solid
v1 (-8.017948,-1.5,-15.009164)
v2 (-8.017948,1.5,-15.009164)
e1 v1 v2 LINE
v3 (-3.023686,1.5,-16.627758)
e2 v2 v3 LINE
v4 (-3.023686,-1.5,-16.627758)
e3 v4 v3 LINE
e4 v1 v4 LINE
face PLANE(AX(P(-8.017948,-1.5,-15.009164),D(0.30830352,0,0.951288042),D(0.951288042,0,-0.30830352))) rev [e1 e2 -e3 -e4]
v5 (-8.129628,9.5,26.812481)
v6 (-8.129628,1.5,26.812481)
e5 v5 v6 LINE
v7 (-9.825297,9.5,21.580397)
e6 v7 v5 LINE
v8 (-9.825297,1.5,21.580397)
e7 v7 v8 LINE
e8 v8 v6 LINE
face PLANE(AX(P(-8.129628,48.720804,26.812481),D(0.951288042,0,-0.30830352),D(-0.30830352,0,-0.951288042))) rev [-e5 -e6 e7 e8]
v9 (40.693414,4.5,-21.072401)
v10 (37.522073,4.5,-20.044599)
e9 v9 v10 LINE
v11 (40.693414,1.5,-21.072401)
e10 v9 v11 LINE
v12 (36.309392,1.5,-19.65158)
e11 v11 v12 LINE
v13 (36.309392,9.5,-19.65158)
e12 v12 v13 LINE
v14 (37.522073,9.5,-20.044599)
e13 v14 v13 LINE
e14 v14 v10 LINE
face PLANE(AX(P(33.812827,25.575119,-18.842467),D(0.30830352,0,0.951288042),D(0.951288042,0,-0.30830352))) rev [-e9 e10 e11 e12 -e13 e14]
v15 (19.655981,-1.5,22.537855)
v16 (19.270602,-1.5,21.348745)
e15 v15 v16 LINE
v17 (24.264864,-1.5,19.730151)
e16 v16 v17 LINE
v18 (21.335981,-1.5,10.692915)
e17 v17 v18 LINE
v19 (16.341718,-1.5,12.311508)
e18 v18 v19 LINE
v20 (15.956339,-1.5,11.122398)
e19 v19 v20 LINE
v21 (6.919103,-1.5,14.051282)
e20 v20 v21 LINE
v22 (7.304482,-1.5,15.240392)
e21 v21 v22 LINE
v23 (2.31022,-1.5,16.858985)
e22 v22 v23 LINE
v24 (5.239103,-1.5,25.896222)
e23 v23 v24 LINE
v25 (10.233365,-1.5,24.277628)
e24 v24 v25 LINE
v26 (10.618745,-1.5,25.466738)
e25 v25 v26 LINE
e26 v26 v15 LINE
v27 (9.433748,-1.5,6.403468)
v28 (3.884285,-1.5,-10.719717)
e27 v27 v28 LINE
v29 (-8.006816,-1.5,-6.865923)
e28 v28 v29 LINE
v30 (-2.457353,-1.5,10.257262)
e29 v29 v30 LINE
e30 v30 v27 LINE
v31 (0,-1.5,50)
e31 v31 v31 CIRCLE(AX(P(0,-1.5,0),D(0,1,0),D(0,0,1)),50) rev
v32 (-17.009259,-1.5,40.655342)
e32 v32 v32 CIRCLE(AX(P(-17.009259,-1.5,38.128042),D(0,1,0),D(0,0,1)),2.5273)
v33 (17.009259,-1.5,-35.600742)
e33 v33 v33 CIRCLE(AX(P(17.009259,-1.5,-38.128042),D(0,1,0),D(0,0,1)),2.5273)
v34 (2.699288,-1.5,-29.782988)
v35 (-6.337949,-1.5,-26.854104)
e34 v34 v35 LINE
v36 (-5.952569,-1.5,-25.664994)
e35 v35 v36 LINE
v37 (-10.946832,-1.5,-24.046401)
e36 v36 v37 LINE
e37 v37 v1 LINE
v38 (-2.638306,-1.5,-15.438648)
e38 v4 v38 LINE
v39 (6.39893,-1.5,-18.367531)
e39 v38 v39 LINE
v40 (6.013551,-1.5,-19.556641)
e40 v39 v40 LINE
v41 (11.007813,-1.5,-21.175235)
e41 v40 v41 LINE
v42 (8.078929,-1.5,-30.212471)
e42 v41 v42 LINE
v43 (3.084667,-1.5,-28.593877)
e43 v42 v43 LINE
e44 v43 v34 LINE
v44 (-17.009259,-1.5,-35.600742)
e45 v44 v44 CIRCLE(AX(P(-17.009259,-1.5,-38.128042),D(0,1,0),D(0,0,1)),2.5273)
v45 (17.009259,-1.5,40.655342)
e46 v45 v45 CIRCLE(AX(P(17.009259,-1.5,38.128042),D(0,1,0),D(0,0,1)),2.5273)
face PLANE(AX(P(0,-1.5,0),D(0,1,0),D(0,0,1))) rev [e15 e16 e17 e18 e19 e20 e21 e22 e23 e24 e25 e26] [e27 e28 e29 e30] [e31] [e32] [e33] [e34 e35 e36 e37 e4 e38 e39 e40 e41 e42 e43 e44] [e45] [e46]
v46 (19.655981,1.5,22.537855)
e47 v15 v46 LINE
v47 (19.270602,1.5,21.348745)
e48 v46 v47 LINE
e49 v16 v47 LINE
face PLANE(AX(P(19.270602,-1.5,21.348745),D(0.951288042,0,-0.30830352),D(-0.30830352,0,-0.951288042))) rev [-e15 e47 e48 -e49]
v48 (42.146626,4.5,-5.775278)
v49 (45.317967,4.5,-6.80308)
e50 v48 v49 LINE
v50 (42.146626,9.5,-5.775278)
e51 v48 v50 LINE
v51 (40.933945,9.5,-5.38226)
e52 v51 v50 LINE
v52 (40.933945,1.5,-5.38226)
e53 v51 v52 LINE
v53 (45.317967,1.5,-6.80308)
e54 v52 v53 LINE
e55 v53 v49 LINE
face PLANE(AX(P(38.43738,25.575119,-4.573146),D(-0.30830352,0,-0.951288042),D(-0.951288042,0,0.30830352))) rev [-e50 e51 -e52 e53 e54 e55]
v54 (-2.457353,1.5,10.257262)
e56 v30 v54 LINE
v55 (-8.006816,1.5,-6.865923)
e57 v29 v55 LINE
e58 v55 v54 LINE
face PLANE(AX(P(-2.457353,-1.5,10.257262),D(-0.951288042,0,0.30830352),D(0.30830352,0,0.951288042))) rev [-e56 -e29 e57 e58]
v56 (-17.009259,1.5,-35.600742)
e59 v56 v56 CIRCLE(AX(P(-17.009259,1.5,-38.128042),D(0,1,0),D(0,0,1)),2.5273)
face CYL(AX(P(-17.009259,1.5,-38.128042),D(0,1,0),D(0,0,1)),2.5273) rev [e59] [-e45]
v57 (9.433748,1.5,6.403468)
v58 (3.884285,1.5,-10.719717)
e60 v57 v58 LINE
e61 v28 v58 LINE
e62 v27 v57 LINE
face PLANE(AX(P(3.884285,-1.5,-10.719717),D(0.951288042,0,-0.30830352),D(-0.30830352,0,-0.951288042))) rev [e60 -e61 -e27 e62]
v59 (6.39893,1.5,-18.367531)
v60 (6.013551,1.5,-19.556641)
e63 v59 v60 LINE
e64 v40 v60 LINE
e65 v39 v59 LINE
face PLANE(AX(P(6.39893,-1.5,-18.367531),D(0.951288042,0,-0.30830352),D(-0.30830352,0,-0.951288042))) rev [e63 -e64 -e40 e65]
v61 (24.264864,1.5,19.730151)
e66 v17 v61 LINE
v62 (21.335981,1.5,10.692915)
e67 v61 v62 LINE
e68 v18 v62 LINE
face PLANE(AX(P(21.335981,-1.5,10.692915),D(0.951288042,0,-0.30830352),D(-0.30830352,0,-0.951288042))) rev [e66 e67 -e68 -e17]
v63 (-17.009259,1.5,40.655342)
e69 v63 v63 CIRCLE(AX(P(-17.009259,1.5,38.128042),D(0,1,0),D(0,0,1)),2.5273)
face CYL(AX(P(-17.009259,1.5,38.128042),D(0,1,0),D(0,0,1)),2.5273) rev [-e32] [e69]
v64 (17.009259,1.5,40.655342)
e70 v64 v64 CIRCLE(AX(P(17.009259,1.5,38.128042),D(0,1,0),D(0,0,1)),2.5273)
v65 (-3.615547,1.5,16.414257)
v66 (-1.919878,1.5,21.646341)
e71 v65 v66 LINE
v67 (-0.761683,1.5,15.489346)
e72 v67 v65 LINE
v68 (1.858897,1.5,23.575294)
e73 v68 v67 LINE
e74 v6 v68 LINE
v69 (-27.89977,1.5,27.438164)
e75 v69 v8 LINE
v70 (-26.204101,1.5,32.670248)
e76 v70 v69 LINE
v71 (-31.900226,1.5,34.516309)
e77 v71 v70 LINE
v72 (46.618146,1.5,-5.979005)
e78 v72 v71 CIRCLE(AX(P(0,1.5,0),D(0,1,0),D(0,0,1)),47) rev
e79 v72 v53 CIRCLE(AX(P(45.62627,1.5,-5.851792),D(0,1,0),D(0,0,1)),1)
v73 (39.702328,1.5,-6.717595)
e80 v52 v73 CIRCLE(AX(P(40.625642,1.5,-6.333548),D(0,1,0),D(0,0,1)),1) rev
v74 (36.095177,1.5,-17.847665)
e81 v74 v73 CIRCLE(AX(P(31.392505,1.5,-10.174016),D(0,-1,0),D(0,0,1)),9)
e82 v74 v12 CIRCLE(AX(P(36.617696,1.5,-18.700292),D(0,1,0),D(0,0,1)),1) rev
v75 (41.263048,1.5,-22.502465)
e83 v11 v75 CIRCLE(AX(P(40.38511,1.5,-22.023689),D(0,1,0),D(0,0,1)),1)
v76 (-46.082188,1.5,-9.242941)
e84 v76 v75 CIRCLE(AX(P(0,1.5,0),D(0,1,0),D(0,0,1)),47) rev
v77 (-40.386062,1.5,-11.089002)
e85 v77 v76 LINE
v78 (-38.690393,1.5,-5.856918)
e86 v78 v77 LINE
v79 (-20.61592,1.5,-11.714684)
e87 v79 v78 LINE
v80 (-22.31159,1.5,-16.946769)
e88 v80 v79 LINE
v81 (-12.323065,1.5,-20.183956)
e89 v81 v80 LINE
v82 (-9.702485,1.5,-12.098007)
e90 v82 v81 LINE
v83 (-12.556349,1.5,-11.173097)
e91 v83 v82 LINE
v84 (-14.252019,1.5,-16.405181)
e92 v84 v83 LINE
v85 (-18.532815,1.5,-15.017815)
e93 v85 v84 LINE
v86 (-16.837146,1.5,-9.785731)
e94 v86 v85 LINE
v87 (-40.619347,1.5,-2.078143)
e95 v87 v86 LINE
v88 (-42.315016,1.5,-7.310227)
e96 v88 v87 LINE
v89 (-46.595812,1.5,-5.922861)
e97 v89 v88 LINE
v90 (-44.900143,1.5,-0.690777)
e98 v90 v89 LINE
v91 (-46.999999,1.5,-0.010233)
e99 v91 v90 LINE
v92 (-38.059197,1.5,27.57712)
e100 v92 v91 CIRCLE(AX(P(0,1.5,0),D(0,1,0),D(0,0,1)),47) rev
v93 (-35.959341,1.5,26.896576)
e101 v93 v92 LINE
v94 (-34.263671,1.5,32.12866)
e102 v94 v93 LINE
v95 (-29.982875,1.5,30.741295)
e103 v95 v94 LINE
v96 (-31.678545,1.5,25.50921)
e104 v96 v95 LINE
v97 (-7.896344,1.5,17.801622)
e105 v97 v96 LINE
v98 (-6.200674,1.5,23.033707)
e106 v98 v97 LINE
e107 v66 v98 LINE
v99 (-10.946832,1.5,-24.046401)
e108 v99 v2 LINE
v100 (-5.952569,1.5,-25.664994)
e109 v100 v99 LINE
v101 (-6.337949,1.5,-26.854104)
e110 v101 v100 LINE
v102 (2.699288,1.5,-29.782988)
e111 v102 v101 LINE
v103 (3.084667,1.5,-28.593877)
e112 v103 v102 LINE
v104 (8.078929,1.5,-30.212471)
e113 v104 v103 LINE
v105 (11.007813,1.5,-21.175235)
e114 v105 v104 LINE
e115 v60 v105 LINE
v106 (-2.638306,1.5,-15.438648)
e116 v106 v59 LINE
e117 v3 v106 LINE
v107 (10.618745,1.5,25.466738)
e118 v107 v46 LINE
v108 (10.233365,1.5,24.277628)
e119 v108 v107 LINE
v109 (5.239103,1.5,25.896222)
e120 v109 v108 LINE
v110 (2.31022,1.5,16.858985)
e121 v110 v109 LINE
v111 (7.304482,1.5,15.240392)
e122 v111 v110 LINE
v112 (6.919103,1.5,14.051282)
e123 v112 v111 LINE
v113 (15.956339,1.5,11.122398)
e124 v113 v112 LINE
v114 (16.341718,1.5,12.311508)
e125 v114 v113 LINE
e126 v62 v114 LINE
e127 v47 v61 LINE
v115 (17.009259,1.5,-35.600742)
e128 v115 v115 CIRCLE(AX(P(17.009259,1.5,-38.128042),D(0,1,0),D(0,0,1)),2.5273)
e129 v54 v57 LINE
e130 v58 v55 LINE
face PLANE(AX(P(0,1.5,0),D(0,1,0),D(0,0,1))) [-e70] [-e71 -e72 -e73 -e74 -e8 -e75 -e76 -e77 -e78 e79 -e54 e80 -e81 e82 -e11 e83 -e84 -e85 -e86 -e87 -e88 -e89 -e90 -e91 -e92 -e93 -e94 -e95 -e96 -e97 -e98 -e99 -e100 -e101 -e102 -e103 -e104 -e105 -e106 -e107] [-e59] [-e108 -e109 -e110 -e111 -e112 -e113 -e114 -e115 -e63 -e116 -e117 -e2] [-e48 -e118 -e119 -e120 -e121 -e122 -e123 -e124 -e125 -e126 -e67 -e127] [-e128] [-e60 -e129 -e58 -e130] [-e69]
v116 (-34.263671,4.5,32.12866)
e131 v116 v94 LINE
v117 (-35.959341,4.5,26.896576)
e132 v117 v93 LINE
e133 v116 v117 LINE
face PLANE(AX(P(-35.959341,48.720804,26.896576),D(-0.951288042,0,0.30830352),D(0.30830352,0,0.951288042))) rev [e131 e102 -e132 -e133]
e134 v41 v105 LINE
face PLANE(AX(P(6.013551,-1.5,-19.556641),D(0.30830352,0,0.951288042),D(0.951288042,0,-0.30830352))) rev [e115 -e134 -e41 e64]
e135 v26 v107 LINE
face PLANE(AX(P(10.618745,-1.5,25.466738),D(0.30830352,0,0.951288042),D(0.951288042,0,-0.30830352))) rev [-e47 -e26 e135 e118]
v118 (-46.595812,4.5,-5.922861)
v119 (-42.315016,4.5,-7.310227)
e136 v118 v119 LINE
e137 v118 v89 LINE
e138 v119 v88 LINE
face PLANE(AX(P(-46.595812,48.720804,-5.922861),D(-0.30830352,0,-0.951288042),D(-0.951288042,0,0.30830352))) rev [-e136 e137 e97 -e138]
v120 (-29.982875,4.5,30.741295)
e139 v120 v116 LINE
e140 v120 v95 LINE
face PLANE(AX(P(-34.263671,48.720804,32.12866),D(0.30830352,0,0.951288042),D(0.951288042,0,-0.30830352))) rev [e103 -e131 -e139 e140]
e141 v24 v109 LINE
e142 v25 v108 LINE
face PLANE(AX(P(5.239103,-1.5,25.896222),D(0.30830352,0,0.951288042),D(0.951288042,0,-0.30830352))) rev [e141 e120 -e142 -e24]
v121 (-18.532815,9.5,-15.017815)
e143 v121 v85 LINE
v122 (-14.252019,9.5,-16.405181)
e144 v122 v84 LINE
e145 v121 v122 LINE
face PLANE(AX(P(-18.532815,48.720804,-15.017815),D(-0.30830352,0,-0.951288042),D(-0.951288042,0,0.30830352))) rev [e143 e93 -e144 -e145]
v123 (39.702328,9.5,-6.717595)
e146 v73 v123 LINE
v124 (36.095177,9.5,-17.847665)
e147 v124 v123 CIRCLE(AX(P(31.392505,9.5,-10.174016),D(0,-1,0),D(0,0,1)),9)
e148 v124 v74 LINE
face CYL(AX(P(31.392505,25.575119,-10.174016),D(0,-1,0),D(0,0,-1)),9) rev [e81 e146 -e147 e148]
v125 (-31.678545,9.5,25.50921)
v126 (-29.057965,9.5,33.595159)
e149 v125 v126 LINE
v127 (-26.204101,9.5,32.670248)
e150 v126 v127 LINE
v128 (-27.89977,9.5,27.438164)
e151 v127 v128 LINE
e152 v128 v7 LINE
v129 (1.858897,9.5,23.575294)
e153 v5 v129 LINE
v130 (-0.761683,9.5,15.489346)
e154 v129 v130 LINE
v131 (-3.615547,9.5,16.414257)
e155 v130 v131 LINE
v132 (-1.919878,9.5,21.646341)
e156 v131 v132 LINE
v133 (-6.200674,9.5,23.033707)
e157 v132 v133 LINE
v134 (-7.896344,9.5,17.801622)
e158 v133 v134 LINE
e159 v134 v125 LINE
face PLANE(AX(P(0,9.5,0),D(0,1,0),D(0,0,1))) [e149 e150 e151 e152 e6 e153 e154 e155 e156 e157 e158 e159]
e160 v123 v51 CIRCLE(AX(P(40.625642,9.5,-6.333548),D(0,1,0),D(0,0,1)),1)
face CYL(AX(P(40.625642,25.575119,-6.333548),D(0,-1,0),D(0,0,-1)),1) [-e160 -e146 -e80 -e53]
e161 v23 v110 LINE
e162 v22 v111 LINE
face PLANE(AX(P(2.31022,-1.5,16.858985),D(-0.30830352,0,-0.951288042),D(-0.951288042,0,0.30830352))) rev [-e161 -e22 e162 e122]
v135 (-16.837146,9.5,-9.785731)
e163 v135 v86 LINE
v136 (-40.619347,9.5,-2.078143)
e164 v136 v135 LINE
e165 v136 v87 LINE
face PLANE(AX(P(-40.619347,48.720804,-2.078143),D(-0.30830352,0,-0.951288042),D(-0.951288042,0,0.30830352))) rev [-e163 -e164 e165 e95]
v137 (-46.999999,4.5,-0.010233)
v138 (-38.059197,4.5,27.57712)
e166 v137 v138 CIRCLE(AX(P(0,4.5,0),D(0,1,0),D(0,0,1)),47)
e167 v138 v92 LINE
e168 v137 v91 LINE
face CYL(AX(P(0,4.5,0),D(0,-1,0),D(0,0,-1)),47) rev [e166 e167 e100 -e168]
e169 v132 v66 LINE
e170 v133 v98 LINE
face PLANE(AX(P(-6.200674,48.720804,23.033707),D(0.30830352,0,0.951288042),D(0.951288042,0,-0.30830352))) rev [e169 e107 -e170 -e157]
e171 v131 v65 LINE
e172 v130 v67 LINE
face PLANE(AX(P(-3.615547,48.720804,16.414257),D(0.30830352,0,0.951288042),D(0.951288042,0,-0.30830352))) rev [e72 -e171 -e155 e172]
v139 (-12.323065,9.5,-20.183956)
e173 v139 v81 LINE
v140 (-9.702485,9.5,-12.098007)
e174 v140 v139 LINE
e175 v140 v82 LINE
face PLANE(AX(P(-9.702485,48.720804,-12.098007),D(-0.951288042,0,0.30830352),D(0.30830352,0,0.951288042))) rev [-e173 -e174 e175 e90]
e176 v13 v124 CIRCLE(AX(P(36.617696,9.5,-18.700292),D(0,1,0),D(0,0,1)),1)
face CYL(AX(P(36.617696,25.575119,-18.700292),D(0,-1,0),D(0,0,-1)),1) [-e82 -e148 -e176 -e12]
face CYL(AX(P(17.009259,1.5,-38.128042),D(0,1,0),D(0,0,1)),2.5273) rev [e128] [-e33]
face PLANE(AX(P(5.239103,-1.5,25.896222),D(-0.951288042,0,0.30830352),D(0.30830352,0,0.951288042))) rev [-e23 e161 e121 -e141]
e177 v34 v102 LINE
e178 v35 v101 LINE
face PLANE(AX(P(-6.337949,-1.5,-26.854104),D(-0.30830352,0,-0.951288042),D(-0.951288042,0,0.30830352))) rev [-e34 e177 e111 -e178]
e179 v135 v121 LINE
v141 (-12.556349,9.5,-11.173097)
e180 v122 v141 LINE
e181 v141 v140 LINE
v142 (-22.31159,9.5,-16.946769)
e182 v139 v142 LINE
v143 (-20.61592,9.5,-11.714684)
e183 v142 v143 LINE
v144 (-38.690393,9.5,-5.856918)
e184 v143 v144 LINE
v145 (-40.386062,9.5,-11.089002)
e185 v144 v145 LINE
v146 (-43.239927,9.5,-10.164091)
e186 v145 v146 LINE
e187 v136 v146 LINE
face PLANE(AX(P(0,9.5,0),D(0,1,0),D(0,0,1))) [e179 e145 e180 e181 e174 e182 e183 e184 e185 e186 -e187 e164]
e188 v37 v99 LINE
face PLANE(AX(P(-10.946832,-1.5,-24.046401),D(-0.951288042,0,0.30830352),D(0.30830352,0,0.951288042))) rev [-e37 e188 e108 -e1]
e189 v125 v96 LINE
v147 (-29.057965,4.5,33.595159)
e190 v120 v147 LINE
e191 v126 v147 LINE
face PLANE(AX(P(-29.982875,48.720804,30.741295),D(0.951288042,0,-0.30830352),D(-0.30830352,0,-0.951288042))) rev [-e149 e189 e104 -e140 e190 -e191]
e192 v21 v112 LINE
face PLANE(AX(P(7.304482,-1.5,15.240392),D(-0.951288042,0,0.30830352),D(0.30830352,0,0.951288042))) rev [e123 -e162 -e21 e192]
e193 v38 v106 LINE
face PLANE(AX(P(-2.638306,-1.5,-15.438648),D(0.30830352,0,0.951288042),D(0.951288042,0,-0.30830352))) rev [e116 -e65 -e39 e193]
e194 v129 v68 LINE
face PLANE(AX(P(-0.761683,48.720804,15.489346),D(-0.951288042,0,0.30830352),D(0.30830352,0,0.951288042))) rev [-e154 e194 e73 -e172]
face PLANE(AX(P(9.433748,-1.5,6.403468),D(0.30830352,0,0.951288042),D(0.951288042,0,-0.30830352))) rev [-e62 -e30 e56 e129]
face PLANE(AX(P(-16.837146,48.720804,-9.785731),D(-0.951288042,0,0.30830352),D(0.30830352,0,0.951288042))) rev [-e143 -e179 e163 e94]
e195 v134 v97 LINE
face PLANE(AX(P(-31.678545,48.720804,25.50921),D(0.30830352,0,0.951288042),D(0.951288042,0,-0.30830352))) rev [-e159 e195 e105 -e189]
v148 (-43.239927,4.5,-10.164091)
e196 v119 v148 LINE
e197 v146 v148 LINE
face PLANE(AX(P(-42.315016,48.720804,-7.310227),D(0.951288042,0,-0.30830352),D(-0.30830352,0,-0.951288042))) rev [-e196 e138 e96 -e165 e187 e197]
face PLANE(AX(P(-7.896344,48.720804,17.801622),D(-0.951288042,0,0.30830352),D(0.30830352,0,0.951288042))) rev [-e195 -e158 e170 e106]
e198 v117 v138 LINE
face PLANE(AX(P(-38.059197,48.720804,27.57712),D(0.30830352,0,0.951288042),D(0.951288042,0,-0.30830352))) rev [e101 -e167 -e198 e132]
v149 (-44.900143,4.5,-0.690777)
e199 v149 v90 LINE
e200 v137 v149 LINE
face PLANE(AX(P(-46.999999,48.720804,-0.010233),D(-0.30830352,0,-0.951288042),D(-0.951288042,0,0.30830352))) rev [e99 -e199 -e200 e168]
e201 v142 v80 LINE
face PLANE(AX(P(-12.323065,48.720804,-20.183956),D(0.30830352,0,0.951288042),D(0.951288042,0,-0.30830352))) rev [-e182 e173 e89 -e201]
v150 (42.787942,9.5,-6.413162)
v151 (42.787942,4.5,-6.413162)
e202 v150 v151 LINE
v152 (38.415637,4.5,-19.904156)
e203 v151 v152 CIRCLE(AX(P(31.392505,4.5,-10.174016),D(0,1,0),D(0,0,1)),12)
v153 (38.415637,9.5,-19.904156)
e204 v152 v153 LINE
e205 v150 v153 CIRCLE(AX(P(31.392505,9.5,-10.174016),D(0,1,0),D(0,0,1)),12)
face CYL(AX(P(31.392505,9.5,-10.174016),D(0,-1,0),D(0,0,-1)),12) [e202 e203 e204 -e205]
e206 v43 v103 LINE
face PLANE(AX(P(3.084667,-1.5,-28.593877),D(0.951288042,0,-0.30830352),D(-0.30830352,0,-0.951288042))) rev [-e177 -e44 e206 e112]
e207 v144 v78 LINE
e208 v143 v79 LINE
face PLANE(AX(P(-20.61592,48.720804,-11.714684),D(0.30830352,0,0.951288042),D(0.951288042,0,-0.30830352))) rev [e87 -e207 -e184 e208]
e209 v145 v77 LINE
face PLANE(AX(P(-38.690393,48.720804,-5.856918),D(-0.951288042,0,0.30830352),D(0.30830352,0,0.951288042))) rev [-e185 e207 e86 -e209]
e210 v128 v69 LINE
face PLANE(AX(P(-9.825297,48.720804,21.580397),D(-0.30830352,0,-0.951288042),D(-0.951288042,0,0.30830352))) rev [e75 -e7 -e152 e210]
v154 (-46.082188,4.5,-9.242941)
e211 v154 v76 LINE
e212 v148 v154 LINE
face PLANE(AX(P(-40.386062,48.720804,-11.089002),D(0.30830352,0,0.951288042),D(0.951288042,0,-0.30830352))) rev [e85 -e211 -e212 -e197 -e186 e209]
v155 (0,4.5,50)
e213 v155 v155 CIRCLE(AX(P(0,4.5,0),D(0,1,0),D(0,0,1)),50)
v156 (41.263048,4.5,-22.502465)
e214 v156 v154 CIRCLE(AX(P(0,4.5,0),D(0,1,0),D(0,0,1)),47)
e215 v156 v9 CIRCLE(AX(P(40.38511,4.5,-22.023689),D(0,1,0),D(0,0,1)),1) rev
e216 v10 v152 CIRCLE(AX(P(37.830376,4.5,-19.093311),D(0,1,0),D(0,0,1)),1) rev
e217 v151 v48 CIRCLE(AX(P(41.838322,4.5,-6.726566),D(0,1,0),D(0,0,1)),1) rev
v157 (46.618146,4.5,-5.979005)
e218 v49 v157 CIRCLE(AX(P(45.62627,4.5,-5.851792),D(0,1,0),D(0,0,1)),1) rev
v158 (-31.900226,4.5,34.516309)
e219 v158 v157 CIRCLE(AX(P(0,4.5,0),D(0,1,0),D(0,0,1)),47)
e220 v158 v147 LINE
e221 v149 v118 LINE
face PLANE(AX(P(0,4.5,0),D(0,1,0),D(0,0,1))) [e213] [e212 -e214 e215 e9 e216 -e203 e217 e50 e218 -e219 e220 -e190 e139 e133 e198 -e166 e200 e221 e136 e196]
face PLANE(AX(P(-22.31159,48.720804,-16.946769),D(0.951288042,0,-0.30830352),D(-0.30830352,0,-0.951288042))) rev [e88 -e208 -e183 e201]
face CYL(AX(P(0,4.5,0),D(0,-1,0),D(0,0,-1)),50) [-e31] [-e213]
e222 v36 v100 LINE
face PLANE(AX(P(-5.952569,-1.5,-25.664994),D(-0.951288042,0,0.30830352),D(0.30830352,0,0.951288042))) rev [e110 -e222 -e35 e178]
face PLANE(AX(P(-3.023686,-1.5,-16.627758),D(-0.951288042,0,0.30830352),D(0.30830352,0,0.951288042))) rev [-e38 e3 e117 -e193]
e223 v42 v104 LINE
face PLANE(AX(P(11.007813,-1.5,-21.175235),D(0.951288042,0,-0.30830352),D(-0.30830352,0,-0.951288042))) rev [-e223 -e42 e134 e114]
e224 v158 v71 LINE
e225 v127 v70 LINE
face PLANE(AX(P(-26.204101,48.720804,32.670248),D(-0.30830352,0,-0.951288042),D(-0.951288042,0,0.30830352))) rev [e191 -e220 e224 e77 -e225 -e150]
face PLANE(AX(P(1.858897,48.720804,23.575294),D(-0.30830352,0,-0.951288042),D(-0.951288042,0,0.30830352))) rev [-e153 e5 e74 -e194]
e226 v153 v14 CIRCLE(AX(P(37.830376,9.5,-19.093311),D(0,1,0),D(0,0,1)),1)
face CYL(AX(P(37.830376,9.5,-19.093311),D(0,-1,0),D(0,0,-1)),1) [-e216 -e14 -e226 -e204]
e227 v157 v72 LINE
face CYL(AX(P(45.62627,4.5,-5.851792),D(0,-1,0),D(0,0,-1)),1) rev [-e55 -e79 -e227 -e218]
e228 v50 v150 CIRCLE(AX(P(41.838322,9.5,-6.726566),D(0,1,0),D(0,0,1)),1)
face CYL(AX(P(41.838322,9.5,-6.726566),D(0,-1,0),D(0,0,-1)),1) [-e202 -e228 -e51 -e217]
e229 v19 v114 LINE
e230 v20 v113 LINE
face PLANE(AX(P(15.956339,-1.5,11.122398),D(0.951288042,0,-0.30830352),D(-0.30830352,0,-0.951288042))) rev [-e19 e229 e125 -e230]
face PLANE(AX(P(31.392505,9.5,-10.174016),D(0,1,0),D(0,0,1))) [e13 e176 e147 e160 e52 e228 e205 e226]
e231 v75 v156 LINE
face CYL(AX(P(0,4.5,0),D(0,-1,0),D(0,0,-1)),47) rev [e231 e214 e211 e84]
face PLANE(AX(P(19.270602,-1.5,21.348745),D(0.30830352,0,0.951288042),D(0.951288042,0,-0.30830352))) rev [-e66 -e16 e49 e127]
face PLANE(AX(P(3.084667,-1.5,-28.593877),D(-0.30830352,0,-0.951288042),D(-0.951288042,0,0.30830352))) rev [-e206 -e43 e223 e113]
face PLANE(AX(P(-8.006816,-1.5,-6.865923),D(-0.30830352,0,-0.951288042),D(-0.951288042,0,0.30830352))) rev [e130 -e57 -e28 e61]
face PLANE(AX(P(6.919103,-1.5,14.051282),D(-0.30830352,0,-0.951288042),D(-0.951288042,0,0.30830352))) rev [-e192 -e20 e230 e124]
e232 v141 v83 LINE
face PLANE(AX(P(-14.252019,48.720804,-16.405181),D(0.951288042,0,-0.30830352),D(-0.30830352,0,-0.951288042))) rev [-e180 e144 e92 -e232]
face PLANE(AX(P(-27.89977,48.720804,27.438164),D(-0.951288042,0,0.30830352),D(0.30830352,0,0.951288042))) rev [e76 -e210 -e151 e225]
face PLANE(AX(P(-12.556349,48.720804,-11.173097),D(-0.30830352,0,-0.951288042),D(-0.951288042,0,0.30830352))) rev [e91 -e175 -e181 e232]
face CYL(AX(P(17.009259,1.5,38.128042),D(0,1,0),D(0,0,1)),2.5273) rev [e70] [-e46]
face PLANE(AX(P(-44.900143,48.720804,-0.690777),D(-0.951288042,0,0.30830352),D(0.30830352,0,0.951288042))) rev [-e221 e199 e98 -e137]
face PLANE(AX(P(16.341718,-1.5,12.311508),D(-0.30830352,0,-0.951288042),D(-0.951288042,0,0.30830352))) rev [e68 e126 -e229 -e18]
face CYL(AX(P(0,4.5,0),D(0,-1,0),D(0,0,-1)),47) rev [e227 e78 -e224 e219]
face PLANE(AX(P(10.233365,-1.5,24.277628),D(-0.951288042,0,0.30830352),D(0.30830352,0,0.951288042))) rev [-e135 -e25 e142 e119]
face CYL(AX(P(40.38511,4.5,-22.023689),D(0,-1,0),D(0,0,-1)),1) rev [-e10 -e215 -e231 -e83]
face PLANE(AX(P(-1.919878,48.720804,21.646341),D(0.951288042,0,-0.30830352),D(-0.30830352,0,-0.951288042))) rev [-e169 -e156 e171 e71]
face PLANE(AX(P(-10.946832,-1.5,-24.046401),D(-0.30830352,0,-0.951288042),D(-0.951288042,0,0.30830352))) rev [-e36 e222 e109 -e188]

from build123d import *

# Parameters (mm, degrees)
A_BASE_T_START                 = -1.5
A_BASE_T_OUTLINE_R             = 47
A_BASE_T_OUTLINE_R_2           = 1
A_BASE_T_DEPTH                 = 3
OUTER_RING_DEPTH               = 3
OUTER_RING_DEPTH_BACK          = 3
SKETCH1_R                      = 50
SKETCH1_R_2                    = 47.000000000000014
SERVO_FRAME_DEPTH              = 3
PATCHING_START                 = -3
SKETCH4_R                      = 1.000000000000005
SKETCH4_R_2                    = 0.9999999999999875
SKETCH4_R_3                    = 1.0000000000000018
PATCHING_DEPTH                 = 3
BOTTOM_HOLES_DEPTH             = 71.77428911688199
SERVO_FRAME_EXTENSION_DEPTH    = 5
F_8_0_199_DIAMETER_HOLE1_D     = 5.0546
F_8_0_199_DIAMETER_HOLE1_DEPTH = 10
F_8_0_199_DIAMETER_HOLE1_TIP   = 1.5185550424683532
SHELL_TAB_DEPTH                = 3
SHELL_TAB_EXTENSION_DEPTH      = 5
CONTOURING_R                   = 1


# Read off the part's stored shape, not the designer's step: a_base_t
with BuildPart() as part:
    # a_base_t outline → a_base_t (new body)
    with BuildSketch(Plane(origin=(0, 0, 0), x_dir=(1, 0, 0), z_dir=(0, 1, 0)).offset(A_BASE_T_START)):
        Circle(A_BASE_T_OUTLINE_R)
        with Locations((-17.009259258, -38.128042167)):
            Circle(A_BASE_T_OUTLINE_R_2, mode=Mode.SUBTRACT)
        with Locations((-9.166666665, -28.284271247)):
            Circle(A_BASE_T_OUTLINE_R_2, mode=Mode.SUBTRACT)
        with Locations((17.009259258, -38.128042167)):
            Circle(A_BASE_T_OUTLINE_R_2, mode=Mode.SUBTRACT)
        with Locations((27.5, -28.284271247)):
            Circle(A_BASE_T_OUTLINE_R_2, mode=Mode.SUBTRACT)
        with Locations((-27.5, 28.284271247)):
            Circle(A_BASE_T_OUTLINE_R_2, mode=Mode.SUBTRACT)
        with Locations((-17.009259258, 38.128042167)):
            Circle(A_BASE_T_OUTLINE_R_2, mode=Mode.SUBTRACT)
        with Locations((9.166666665, 28.284271247)):
            Circle(A_BASE_T_OUTLINE_R_2, mode=Mode.SUBTRACT)
        with Locations((17.009259258, 38.128042167)):
            Circle(A_BASE_T_OUTLINE_R_2, mode=Mode.SUBTRACT)
    extrude(amount=A_BASE_T_DEPTH)

    # Sketch1 → Outer Ring (add, two sides: drawn at the far end of the back side and taken through both)
    with BuildSketch(Plane(origin=(0, 1.5, 0), x_dir=(1, 0, 0), z_dir=(0, 1, 0)).offset(-OUTER_RING_DEPTH_BACK)):
        with Locations(Location((0, 0, 0), (0, 0, 270))):
            Circle(SKETCH1_R)
        with Locations(Location((0, 0, 0), (0, 0, 270))):
            Circle(SKETCH1_R_2, mode=Mode.SUBTRACT)
    extrude(amount=OUTER_RING_DEPTH + OUTER_RING_DEPTH_BACK)

    # Sketch2 → Servo Frame (add)
    with BuildSketch(Plane(origin=(0, 1.5, 0), x_dir=(1, 0, 0), z_dir=(0, 1, 0))):
        with BuildLine():
            Line((-38.0591968031926, -27.57711984047382), (-35.959340758040334, -26.89657621793413))
            Line((-35.959340758040334, -26.89657621793413), (-34.26367139752046, -32.128660450798996))
            Line((-34.26367139752046, -32.128660450798996), (-29.982875206994592, -30.74129461037364))
            Line((-29.982875206994592, -30.74129461037364), (-31.678544567514475, -25.509210377508683))
            Line((-31.678544567514475, -25.509210377508683), (-7.896343509037404, -17.801622375145534))
            Line((-7.896343509037404, -17.801622375145534), (-6.200674148517496, -23.033706608010526))
            Line((-6.200674148517496, -23.033706608010526), (-1.9198779579916272, -21.64634076758515))
            Line((-1.9198779579916272, -21.64634076758515), (-3.6155473185115334, -16.414256534720167))
            Line((-3.6155473185115334, -16.414256534720167), (-0.7616831914942761, -15.489345974436619))
            Line((-0.7616831914942761, -15.489345974436619), (1.8588967293091871, -23.57529433431882))
            Line((1.8588967293091871, -23.57529433431882), (-8.1296277152512, -26.812481295311326))
            Line((-8.1296277152512, -26.812481295311326), (-9.825297075771067, -21.580397062446362))
            Line((-9.825297075771067, -21.580397062446362), (-27.89976988021365, -27.438163944242362))
            Line((-27.89976988021365, -27.438163944242362), (-26.20410051969376, -32.670248177107304))
            Line((-26.20410051969376, -32.670248177107304), (-31.900225974204588, -34.516308939321476))
            ThreePointArc((-31.900225974204588, -34.516308939321476), (-35.15136263609195, -31.199065768480295), (-38.0591968031926, -27.57711984047382))
        make_face()
        with BuildLine():
            Line((-12.323065195039092, 20.183955613279007), (-22.311589639599458, 16.946768652286423))
            Line((-22.311589639599458, 16.946768652286423), (-20.615920279079525, 11.714684419421493))
            Line((-20.615920279079525, 11.714684419421493), (-38.690393083522096, 5.856917537625489))
            Line((-38.690393083522096, 5.856917537625489), (-40.38606244404183, 11.089001770490507))
            Line((-40.38606244404183, 11.089001770490507), (-46.08218789855281, 9.242941008276162))
            ThreePointArc((-46.08218789855281, 9.242941008276162), (-46.769478259318326, 4.649290628811158), (-46.999998885933856, 0.01023338735953519))
            Line((-46.999998885933856, 0.01023338735953519), (-44.90014284078164, 0.6907770098992967))
            Line((-44.90014284078164, 0.6907770098992967), (-46.595812201301534, 5.922861242764241))
            Line((-46.595812201301534, 5.922861242764241), (-42.31501601077568, 7.31022708318961))
            Line((-42.31501601077568, 7.31022708318961), (-40.61934665025577, 2.0781428503246593))
            Line((-40.61934665025577, 2.0781428503246593), (-16.8371455917787, 9.785730852687836))
            Line((-16.8371455917787, 9.785730852687836), (-18.53281495229861, 15.017815085552826))
            Line((-18.53281495229861, 15.017815085552826), (-14.252018761772744, 16.405180925978193))
            Line((-14.252018761772744, 16.405180925978193), (-12.556349401252827, 11.173096693113212))
            Line((-12.556349401252827, 11.173096693113212), (-9.702485274235583, 12.09800725339679))
            Line((-9.702485274235583, 12.09800725339679), (-12.323065195039092, 20.183955613279007))
        make_face()
    extrude(amount=SERVO_FRAME_DEPTH)

    # Sketch4 → Patching (add)
    with BuildSketch(Plane(origin=(0, 1.5, 0), x_dir=(1, 0, 0), z_dir=(0, 1, 0)).offset(PATCHING_START)):
        with Locations((-9.166666664999994, -28.284271247461895)):
            Circle(SKETCH4_R)
        with Locations((27.499999999999897, -28.284271247461895)):
            Circle(SKETCH4_R_2)
        with Locations((-27.499999999999897, 28.284271247461895)):
            Circle(SKETCH4_R_3)
        with Locations((9.166666664999994, 28.284271247461895)):
            Circle(SKETCH4_R)
    extrude(amount=PATCHING_DEPTH)

    # Sketch3 → Bottom Holes (cut, through all)
    with BuildSketch(Plane(origin=(0, 1.5, 0), x_dir=(1, 0, 0), z_dir=(0, 1, 0))):
        Polygon((-2.4573525520141377, -10.257261741571627), (-8.006815913715702, 6.865923020531821), (3.8842846155226813, 10.719717021713405), (9.43374797722423, -6.403467740390065), align=None)
        Polygon((11.007812758181103, 21.175234550786502), (8.078929317282705, 30.212470953007827), (3.084667095002796, 28.593877472511632), (2.6992876948846334, 29.78298752543549), (-6.337948707336641, 26.854104084537454), (-5.952569307218477, 25.6649940316136), (-10.9468315294987, 24.046400551117266), (-8.017948088600651, 15.009164148896), (-3.023685866320578, 16.62775762939225), (-2.6383064662022653, 15.438647576468425), (6.398929936019005, 18.36753101736646), (6.01355053590084, 19.55664107029031), align=None)
        Polygon((19.270601899965627, -21.348744750290177), (19.65598130008379, -22.53785480321403), (10.618744897862516, -25.46673824411206), (10.233365497744353, -24.27762819118821), (5.239103275464198, -25.89622167168446), (2.3102198345661495, -16.85898526946319), (7.304482056846301, -15.240391788966894), (6.9191026567281435, -14.051281736043038), (15.95633905894941, -11.122398295145004), (16.34171845906757, -12.31150834806886), (21.335980681347763, -10.692914867572457), (24.2648641222456, -19.7301512697939), align=None)
    extrude(amount=-BOTTOM_HOLES_DEPTH, mode=Mode.SUBTRACT)

    # Sketch8 → Servo Frame Extension (add)
    with BuildSketch(Plane(origin=(0, 4.500000000000001, 0), x_dir=(1, 0, 0), z_dir=(0, 1, 0))):
        Polygon((1.8588967293091865, -23.57529433431882), (-0.7616831914942761, -15.489345974436619), (-3.6155473185115334, -16.414256534720167), (-1.9198779579916272, -21.64634076758515), (-6.200674148517496, -23.033706608010526), (-7.896343509037404, -17.801622375145534), (-31.678544567514475, -25.509210377508683), (-29.982875206994592, -30.74129461037364), (-29.057964646711014, -33.59515873739088), (-26.20410051969376, -32.670248177107304), (-27.89976988021365, -27.438163944242362), (-9.825297075771067, -21.580397062446362), (-8.1296277152512, -26.812481295311326), align=None)
        Polygon((-40.38606244404183, 11.089001770490507), (-43.23992657105916, 10.164091210206845), (-42.31501601077568, 7.31022708318961), (-40.61934665025577, 2.0781428503246593), (-16.837145591778697, 9.785730852687836), (-18.53281495229861, 15.017815085552826), (-14.252018761772744, 16.405180925978193), (-12.556349401252827, 11.173096693113212), (-9.702485274235583, 12.09800725339679), (-12.323065195039092, 20.183955613279007), (-22.311589639599458, 16.946768652286423), (-20.615920279079525, 11.714684419421493), (-38.690393083522096, 5.856917537625489), align=None)
    extrude(amount=SERVO_FRAME_EXTENSION_DEPTH)

    # #8 (0.199) Diameter Hole1
    with Locations(Plane(origin=(0, 1.5, 0), x_dir=(1, 0, 0), z_dir=(0, 1, 0))):
        with Locations((17.009259258, -38.128042167), (17.009259258, 38.128042167), (-17.009259258, 38.128042167), (-17.009259258, -38.128042167)):
            Hole(F_8_0_199_DIAMETER_HOLE1_D / 2, depth=F_8_0_199_DIAMETER_HOLE1_DEPTH)
            with Locations((0, 0, -(F_8_0_199_DIAMETER_HOLE1_DEPTH + F_8_0_199_DIAMETER_HOLE1_TIP / 2))):  # 118° drill point
                Cone(0, F_8_0_199_DIAMETER_HOLE1_D / 2, F_8_0_199_DIAMETER_HOLE1_TIP, mode=Mode.SUBTRACT)

    # Sketch21 → Shell Tab (add)
    with BuildSketch(Plane(origin=(0, 1.5, 0), x_dir=(1, 0, 0), z_dir=(0, 1, 0))):
        with BuildLine():
            Line((38.43738005388435, 4.573146492125436), (46.4498888135124, 7.169925328225916))
            ThreePointArc((46.4498888135124, 7.169925328225916), (44.71053798993682, 14.490265444442931), (41.825336012094446, 21.439245963312132))
            Line((41.825336012094446, 21.439245963312132), (33.81282725246639, 18.842467127211638))
            ThreePointArc((33.81282725246639, 18.842467127211638), (39.954097778241405, 12.948747843970278), (38.43738005388435, 4.573146492125436))
        make_face()
    extrude(amount=SHELL_TAB_DEPTH)

    # Sketch22 → Shell Tab Extension (add)
    with BuildSketch(Plane(origin=(0, 4.500000000000001, 0), x_dir=(1, 0, 0), z_dir=(0, 1, 0))):
        with BuildLine():
            Line((38.43738005388435, 4.573146492125436), (42.61596967836049, 5.927388144410685))
            ThreePointArc((42.61596967836049, 5.927388144410685), (42.80796190525865, 13.873658404253868), (37.99141687694254, 20.19670877949689))
            Line((37.99141687694254, 20.19670877949689), (33.81282725246639, 18.842467127211638))
            ThreePointArc((33.81282725246639, 18.842467127211638), (39.954097778241405, 12.948747843970278), (38.43738005388435, 4.573146492125436))
        make_face()
    extrude(amount=SHELL_TAB_EXTENSION_DEPTH)

    # Contouring
    contouring_edges = [part.edges().sort_by_distance(p)[0] for p in [
        (33.81282725246639, 5.5, -18.84246712721164),
        (38.43738005388435, 5.5, -4.573146492125435),
        (46.44988881351241, 3, -7.169925328225917),
        (41.82533601209445, 3, -21.439245963312132),
        (42.61596967836049, 7.000000000000001, -5.927388144410685),
        (37.99141687694254, 7.000000000000001, -20.19670877949689),
    ]]
    fillet(contouring_edges, radius=CONTOURING_R)


solid = part.part
